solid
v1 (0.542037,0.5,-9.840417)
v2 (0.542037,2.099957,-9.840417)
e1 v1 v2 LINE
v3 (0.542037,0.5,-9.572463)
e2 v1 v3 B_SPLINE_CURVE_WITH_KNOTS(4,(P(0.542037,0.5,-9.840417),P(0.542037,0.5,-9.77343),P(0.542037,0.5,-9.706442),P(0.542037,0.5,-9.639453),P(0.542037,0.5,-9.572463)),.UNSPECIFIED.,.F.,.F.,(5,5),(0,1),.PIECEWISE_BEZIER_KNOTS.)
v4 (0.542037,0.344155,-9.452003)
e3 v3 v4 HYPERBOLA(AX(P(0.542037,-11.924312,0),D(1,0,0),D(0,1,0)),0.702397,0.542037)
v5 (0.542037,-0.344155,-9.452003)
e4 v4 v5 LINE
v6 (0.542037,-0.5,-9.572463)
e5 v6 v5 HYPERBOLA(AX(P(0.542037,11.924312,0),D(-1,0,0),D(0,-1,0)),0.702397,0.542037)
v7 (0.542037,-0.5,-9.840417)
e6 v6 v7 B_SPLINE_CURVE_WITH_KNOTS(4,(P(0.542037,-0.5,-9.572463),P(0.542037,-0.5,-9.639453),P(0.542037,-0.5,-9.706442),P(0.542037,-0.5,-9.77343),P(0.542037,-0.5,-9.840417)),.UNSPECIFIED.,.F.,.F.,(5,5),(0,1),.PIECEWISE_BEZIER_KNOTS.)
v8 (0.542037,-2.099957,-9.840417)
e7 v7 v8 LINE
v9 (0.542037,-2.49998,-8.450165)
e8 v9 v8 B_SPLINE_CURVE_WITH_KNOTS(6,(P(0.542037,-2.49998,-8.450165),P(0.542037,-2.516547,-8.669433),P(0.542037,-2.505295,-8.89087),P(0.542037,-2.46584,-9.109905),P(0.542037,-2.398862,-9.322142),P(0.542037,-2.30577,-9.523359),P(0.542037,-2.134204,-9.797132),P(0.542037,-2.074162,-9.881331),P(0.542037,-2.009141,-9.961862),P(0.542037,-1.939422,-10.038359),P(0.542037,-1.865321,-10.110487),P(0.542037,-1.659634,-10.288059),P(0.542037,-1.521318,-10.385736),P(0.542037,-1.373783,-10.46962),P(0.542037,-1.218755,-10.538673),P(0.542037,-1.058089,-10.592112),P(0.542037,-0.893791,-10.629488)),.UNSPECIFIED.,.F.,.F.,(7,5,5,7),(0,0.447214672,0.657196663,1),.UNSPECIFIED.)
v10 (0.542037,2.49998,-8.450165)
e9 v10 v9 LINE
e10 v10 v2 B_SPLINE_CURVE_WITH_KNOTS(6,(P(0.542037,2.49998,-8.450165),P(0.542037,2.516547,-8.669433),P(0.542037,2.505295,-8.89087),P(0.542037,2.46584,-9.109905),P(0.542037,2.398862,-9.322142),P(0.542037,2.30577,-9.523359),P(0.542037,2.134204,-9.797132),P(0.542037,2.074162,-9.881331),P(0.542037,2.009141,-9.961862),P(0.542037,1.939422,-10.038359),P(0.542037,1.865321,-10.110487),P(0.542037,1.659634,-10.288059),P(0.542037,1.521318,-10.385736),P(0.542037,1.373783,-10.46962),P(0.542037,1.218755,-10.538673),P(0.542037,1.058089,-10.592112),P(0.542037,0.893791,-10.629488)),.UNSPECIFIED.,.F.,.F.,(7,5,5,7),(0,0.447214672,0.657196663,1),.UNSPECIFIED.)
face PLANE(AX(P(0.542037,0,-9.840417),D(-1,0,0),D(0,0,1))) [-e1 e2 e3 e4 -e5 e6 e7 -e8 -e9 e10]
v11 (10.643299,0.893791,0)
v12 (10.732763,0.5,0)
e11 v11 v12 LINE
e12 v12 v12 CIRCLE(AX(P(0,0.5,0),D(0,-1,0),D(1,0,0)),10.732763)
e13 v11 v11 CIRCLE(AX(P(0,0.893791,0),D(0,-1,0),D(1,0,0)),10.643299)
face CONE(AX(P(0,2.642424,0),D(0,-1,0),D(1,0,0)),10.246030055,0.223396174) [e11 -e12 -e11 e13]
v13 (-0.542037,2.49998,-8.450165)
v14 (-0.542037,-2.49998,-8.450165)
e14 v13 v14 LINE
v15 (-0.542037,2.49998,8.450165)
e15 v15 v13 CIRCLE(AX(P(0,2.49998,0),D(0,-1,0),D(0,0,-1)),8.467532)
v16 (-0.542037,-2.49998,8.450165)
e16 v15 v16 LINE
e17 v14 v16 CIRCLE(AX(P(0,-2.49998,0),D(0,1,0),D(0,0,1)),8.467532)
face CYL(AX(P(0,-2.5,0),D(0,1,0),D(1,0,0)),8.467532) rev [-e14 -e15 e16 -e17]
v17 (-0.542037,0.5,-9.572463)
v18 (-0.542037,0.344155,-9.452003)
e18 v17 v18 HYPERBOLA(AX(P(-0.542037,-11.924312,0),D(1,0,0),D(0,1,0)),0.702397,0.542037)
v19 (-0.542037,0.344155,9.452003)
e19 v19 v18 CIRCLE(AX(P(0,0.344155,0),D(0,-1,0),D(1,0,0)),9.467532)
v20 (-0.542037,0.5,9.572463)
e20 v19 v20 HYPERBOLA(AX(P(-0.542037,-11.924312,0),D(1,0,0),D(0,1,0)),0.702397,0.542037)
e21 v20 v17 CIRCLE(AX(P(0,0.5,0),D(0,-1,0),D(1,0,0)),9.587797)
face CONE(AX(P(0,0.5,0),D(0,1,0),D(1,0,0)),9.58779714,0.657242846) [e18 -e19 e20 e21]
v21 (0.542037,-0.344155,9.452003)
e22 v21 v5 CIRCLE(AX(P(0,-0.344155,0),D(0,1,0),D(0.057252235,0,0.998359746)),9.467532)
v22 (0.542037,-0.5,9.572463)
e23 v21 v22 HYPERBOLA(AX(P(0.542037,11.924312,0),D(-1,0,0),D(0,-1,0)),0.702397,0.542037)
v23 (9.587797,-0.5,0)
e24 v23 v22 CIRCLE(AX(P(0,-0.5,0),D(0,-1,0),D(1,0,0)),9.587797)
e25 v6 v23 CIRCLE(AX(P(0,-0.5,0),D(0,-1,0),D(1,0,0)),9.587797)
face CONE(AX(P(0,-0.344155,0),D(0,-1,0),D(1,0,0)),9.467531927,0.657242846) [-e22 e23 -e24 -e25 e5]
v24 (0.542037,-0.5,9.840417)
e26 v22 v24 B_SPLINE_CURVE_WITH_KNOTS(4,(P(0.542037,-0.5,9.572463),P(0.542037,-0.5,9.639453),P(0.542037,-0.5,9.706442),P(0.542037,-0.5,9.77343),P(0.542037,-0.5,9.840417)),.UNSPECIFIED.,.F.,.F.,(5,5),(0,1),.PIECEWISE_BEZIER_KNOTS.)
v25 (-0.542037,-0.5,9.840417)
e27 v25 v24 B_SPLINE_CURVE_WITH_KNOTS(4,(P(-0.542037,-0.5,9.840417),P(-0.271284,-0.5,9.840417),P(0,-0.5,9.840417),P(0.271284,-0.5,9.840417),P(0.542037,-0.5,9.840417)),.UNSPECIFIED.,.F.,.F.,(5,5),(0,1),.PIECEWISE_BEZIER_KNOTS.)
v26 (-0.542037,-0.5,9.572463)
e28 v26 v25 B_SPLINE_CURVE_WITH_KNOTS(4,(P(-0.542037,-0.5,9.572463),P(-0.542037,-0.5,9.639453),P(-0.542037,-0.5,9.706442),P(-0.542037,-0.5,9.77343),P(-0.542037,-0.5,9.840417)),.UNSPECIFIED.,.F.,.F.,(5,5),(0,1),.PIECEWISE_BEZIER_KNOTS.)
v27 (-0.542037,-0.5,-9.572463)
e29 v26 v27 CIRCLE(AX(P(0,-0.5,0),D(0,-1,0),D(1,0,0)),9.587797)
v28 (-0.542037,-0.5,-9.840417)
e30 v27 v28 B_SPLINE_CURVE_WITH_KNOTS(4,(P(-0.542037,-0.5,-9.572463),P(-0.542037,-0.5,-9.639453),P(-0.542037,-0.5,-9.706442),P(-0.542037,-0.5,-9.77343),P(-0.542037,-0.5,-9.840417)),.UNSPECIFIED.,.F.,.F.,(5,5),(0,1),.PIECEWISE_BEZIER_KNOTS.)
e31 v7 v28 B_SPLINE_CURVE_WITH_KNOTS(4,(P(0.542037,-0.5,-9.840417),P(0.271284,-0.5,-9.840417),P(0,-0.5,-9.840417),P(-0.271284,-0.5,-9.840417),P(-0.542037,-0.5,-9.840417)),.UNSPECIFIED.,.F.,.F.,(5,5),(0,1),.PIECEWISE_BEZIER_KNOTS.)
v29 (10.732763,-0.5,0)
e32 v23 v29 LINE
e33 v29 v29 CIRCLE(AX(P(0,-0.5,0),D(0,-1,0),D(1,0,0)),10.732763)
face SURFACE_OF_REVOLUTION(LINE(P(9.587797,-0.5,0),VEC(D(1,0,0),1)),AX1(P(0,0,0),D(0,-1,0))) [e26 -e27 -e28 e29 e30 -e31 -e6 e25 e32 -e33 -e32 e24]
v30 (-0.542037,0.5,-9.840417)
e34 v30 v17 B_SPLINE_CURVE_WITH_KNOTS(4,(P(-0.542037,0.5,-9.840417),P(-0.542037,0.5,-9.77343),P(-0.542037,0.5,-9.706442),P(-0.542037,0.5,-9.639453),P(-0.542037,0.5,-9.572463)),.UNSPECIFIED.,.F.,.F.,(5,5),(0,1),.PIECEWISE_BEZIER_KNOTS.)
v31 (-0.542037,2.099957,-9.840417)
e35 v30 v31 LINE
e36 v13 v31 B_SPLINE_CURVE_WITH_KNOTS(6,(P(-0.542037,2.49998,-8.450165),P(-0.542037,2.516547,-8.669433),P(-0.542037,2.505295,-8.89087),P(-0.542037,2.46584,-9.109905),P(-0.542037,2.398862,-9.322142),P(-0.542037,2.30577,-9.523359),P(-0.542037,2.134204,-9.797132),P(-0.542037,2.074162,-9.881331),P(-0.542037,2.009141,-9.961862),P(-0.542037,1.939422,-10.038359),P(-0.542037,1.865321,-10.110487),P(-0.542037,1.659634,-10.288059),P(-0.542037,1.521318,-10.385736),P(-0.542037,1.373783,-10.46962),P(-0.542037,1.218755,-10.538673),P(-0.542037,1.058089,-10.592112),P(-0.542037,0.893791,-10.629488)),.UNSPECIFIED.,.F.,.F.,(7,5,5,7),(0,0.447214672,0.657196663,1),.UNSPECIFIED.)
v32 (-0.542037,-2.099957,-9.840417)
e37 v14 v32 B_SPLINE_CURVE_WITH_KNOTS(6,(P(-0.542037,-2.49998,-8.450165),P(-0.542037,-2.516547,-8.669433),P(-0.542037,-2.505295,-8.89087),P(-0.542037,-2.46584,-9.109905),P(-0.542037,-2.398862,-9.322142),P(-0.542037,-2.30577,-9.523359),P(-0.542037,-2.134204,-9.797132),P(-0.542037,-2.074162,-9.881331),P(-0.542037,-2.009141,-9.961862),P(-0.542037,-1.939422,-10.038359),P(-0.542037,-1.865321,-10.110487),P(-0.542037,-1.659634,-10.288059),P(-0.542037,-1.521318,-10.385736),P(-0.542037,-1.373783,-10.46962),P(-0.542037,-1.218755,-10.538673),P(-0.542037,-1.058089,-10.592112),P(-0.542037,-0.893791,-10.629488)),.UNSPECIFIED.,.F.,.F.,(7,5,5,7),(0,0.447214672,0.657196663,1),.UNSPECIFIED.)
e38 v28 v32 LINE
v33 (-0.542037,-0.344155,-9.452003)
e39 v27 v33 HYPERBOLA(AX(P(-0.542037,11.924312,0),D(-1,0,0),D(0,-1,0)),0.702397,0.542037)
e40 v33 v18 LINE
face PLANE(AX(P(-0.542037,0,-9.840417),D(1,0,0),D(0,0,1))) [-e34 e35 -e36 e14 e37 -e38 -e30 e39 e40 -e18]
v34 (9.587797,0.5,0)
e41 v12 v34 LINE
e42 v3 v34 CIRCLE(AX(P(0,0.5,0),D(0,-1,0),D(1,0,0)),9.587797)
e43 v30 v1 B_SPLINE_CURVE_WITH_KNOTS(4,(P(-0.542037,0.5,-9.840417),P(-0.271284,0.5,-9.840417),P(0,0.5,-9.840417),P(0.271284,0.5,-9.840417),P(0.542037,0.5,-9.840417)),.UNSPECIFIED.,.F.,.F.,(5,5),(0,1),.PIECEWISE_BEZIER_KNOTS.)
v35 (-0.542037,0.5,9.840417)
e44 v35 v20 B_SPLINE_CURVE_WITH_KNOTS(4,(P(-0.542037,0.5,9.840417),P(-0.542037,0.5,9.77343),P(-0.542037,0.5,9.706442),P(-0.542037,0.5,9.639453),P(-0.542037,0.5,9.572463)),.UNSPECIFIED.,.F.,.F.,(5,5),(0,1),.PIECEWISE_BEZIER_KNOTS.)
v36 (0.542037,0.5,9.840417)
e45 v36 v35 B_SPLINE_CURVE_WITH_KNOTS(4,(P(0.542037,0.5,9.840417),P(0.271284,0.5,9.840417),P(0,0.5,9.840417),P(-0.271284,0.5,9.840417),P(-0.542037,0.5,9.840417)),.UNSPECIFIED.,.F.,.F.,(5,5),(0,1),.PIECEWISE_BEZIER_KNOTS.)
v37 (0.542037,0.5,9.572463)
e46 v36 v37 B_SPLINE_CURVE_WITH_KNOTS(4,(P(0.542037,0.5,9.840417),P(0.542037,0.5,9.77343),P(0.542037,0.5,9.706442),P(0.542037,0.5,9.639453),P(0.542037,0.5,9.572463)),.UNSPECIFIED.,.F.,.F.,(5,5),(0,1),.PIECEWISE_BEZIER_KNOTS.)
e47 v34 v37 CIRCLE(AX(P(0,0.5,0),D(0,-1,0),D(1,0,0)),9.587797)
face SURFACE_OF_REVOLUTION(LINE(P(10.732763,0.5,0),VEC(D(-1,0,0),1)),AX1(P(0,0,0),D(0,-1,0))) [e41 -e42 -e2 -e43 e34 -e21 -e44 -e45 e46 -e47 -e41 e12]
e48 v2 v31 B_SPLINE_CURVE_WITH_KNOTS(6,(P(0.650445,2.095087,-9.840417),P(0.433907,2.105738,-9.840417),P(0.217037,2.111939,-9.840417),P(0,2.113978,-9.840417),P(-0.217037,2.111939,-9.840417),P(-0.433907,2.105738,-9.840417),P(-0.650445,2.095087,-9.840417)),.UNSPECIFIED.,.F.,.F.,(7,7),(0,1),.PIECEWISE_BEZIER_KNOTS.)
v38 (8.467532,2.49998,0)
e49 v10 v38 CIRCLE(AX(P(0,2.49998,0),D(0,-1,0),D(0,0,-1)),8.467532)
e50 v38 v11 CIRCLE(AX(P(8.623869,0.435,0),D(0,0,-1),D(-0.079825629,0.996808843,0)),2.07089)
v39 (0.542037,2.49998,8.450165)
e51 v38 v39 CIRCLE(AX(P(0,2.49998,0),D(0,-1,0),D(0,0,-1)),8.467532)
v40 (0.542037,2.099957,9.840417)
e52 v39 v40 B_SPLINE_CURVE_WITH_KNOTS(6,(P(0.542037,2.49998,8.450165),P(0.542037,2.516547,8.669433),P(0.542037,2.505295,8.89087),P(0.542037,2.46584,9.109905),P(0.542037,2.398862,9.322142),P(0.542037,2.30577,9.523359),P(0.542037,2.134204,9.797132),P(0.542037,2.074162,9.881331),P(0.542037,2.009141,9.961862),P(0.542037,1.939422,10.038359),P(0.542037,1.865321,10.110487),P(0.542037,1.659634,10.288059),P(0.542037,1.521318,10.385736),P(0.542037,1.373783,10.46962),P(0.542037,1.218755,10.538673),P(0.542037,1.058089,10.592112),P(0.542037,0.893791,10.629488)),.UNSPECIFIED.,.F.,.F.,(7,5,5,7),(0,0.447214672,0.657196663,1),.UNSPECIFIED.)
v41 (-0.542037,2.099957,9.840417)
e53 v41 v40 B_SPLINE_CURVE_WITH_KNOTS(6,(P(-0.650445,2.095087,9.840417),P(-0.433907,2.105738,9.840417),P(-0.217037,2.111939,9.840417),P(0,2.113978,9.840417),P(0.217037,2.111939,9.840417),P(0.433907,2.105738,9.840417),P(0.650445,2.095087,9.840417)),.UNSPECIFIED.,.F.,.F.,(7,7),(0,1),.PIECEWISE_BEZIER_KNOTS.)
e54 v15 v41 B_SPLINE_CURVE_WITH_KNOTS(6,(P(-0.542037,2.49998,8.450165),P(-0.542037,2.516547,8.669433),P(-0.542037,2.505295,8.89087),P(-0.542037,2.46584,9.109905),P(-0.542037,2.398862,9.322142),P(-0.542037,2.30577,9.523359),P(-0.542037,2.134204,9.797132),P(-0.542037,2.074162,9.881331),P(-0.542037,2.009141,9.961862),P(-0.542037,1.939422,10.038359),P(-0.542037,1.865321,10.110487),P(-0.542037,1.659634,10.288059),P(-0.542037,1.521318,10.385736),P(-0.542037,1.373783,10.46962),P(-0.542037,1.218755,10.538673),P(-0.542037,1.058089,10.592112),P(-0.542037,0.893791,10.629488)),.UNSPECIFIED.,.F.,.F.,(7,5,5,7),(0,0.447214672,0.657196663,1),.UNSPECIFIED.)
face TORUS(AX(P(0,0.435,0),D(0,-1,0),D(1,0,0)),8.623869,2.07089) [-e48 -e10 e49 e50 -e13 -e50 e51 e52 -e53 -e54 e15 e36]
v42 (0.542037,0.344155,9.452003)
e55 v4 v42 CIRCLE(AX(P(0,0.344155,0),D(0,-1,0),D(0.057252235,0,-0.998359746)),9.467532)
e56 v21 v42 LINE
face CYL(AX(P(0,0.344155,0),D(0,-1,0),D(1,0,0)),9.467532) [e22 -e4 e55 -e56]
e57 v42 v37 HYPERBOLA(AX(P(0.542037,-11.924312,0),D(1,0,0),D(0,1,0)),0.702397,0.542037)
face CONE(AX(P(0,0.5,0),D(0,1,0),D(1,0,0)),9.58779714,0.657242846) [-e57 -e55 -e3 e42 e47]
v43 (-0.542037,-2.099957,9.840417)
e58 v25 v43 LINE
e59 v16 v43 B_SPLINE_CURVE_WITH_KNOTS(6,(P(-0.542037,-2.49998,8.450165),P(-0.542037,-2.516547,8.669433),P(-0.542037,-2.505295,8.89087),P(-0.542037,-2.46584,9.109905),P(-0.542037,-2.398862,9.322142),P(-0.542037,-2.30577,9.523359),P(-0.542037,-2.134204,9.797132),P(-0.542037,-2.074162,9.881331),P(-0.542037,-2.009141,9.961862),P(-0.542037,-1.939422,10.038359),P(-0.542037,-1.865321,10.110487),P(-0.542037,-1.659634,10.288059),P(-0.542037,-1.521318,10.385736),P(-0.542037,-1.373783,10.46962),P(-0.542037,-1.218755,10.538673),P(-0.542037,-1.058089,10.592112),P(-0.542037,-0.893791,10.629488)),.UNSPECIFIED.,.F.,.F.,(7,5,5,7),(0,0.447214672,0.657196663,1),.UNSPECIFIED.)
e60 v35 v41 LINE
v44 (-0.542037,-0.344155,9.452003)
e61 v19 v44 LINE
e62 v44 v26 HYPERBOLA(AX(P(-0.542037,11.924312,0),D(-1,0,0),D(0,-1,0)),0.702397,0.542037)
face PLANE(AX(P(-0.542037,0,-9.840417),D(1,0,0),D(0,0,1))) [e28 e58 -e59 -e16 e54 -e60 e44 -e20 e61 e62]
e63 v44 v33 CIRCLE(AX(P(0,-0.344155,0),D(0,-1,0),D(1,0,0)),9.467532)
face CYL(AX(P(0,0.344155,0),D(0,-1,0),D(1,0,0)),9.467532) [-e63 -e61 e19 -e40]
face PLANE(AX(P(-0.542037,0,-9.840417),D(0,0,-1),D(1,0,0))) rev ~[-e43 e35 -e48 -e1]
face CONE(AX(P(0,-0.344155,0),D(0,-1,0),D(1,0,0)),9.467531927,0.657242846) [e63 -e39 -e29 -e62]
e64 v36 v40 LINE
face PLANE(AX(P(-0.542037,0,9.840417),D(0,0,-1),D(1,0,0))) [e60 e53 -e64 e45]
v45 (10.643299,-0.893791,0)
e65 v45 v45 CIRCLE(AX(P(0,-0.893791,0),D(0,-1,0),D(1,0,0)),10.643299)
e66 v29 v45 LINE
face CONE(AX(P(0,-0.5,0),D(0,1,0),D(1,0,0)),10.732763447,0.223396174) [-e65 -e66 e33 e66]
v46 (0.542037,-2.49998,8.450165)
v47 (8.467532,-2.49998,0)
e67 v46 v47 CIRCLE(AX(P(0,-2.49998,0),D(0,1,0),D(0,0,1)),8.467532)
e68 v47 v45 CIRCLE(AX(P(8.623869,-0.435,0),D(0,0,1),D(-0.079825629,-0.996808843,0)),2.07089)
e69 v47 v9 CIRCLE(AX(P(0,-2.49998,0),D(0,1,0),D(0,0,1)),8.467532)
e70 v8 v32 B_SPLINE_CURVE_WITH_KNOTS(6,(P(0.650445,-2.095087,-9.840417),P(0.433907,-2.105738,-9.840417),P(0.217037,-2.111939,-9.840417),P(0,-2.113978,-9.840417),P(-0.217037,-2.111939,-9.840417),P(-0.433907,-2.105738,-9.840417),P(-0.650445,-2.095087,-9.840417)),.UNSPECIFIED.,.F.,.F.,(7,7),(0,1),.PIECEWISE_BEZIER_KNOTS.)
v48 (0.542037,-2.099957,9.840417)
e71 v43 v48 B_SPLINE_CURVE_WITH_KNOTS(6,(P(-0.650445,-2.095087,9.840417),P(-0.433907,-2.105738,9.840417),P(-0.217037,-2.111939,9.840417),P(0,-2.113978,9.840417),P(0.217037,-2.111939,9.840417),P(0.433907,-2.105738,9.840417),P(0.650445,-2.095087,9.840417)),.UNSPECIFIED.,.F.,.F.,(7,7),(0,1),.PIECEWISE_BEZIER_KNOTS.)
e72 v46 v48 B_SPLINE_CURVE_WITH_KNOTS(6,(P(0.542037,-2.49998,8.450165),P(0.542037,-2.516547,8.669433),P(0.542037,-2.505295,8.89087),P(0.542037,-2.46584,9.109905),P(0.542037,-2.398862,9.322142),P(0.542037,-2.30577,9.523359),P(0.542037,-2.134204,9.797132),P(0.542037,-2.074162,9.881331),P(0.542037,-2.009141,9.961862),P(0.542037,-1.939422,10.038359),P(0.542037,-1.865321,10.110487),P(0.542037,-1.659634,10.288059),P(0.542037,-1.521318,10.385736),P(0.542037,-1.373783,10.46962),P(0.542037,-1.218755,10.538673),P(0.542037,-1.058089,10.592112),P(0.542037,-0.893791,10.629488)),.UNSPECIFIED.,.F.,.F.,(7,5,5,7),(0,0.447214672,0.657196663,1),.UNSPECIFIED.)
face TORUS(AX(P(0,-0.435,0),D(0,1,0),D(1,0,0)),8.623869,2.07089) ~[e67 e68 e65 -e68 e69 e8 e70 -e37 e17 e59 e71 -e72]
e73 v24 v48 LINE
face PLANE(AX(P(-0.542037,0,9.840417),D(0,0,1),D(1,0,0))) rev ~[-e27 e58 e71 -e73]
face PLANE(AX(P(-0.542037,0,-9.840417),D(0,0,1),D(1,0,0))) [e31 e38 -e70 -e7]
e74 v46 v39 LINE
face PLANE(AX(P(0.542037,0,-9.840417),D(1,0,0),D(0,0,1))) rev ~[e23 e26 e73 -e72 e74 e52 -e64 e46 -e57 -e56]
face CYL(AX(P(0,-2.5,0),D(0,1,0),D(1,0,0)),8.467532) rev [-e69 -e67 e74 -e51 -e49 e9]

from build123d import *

# Parameters (mm, degrees)
F4_W          = 1.0840747273
F4_H          = 19.680833444
F5_DEPTH      = 25
F5_DEPTH_BACK = 25


# Not quite as in the source:
# - a fillet or chamfer that OpenCascade refuses, or shapes differently, is made with other operations: its cross-section is extruded or revolved along the edge and cut away or added


with BuildPart() as f2:
    # F2: sweep along a path in F0
    with BuildLine(Plane.XZ) as f2_path:
        CenterArc((0, 0), 8.65, 0, 360)
    # F1 (on Right) → F2 (sweep)
    with BuildSketch(Plane.YZ):
        Polygon((-2.5, 8.4675319269), (0, 8.4675319269), (2.5, 8.4675319269), (2.6424242295, 10.246030055), (0.5, 10.7327634469), (0.5, 9.5877971399), (0.344154765, 9.4675319269), (0, 9.4675319269), (-0.344154765, 9.4675319269), (-0.5, 9.5877971399), (-0.5, 10.7327634469), (-2.6424242295, 10.246030055), align=None)
    sweep(path=f2_path.line)

    # F3: fillet of radius 2.0708896165 on 2 edges, made by hand

    # F3_s1 → F3_t2 (revolve, cut)
    with BuildSketch(Plane.XY):
        with BuildLine():
            ThreePointArc((8.4585593646, -2.4992814666), (9.85018085, -2.103755641), (10.6432988419, -0.8937908116))
            Line((10.6432988419, -0.8937908116), (10.246030055, -2.6424242295))
            Line((10.246030055, -2.6424242295), (8.4585593646, -2.4992814666))
        make_face()
    revolve(axis=Axis((0, -2.6424242295, 0), (0, -1, 0)), mode=Mode.SUBTRACT)

    # F3_s3 → F3_t4 (revolve, cut)
    with BuildSketch(Plane.XY):
        with BuildLine():
            ThreePointArc((8.4585593646, 2.4992814666), (9.85018085, 2.103755641), (10.6432988419, 0.8937908116))
            Line((10.6432988419, 0.8937908116), (10.246030055, 2.6424242295))
            Line((10.246030055, 2.6424242295), (8.4585593646, 2.4992814666))
        make_face()
    revolve(axis=Axis((0, 2.6424242295, 0), (0, -1, 0)), mode=Mode.SUBTRACT)

    # F4 (on Front) → F5 (cut, two sides)
    with BuildSketch(Plane.XZ) as f5_sk:
        Rectangle(F4_W, F4_H)
    extrude(amount=-F5_DEPTH, mode=Mode.SUBTRACT)
    extrude(f5_sk.sketch, amount=F5_DEPTH_BACK, mode=Mode.SUBTRACT)


solid = f2.part
